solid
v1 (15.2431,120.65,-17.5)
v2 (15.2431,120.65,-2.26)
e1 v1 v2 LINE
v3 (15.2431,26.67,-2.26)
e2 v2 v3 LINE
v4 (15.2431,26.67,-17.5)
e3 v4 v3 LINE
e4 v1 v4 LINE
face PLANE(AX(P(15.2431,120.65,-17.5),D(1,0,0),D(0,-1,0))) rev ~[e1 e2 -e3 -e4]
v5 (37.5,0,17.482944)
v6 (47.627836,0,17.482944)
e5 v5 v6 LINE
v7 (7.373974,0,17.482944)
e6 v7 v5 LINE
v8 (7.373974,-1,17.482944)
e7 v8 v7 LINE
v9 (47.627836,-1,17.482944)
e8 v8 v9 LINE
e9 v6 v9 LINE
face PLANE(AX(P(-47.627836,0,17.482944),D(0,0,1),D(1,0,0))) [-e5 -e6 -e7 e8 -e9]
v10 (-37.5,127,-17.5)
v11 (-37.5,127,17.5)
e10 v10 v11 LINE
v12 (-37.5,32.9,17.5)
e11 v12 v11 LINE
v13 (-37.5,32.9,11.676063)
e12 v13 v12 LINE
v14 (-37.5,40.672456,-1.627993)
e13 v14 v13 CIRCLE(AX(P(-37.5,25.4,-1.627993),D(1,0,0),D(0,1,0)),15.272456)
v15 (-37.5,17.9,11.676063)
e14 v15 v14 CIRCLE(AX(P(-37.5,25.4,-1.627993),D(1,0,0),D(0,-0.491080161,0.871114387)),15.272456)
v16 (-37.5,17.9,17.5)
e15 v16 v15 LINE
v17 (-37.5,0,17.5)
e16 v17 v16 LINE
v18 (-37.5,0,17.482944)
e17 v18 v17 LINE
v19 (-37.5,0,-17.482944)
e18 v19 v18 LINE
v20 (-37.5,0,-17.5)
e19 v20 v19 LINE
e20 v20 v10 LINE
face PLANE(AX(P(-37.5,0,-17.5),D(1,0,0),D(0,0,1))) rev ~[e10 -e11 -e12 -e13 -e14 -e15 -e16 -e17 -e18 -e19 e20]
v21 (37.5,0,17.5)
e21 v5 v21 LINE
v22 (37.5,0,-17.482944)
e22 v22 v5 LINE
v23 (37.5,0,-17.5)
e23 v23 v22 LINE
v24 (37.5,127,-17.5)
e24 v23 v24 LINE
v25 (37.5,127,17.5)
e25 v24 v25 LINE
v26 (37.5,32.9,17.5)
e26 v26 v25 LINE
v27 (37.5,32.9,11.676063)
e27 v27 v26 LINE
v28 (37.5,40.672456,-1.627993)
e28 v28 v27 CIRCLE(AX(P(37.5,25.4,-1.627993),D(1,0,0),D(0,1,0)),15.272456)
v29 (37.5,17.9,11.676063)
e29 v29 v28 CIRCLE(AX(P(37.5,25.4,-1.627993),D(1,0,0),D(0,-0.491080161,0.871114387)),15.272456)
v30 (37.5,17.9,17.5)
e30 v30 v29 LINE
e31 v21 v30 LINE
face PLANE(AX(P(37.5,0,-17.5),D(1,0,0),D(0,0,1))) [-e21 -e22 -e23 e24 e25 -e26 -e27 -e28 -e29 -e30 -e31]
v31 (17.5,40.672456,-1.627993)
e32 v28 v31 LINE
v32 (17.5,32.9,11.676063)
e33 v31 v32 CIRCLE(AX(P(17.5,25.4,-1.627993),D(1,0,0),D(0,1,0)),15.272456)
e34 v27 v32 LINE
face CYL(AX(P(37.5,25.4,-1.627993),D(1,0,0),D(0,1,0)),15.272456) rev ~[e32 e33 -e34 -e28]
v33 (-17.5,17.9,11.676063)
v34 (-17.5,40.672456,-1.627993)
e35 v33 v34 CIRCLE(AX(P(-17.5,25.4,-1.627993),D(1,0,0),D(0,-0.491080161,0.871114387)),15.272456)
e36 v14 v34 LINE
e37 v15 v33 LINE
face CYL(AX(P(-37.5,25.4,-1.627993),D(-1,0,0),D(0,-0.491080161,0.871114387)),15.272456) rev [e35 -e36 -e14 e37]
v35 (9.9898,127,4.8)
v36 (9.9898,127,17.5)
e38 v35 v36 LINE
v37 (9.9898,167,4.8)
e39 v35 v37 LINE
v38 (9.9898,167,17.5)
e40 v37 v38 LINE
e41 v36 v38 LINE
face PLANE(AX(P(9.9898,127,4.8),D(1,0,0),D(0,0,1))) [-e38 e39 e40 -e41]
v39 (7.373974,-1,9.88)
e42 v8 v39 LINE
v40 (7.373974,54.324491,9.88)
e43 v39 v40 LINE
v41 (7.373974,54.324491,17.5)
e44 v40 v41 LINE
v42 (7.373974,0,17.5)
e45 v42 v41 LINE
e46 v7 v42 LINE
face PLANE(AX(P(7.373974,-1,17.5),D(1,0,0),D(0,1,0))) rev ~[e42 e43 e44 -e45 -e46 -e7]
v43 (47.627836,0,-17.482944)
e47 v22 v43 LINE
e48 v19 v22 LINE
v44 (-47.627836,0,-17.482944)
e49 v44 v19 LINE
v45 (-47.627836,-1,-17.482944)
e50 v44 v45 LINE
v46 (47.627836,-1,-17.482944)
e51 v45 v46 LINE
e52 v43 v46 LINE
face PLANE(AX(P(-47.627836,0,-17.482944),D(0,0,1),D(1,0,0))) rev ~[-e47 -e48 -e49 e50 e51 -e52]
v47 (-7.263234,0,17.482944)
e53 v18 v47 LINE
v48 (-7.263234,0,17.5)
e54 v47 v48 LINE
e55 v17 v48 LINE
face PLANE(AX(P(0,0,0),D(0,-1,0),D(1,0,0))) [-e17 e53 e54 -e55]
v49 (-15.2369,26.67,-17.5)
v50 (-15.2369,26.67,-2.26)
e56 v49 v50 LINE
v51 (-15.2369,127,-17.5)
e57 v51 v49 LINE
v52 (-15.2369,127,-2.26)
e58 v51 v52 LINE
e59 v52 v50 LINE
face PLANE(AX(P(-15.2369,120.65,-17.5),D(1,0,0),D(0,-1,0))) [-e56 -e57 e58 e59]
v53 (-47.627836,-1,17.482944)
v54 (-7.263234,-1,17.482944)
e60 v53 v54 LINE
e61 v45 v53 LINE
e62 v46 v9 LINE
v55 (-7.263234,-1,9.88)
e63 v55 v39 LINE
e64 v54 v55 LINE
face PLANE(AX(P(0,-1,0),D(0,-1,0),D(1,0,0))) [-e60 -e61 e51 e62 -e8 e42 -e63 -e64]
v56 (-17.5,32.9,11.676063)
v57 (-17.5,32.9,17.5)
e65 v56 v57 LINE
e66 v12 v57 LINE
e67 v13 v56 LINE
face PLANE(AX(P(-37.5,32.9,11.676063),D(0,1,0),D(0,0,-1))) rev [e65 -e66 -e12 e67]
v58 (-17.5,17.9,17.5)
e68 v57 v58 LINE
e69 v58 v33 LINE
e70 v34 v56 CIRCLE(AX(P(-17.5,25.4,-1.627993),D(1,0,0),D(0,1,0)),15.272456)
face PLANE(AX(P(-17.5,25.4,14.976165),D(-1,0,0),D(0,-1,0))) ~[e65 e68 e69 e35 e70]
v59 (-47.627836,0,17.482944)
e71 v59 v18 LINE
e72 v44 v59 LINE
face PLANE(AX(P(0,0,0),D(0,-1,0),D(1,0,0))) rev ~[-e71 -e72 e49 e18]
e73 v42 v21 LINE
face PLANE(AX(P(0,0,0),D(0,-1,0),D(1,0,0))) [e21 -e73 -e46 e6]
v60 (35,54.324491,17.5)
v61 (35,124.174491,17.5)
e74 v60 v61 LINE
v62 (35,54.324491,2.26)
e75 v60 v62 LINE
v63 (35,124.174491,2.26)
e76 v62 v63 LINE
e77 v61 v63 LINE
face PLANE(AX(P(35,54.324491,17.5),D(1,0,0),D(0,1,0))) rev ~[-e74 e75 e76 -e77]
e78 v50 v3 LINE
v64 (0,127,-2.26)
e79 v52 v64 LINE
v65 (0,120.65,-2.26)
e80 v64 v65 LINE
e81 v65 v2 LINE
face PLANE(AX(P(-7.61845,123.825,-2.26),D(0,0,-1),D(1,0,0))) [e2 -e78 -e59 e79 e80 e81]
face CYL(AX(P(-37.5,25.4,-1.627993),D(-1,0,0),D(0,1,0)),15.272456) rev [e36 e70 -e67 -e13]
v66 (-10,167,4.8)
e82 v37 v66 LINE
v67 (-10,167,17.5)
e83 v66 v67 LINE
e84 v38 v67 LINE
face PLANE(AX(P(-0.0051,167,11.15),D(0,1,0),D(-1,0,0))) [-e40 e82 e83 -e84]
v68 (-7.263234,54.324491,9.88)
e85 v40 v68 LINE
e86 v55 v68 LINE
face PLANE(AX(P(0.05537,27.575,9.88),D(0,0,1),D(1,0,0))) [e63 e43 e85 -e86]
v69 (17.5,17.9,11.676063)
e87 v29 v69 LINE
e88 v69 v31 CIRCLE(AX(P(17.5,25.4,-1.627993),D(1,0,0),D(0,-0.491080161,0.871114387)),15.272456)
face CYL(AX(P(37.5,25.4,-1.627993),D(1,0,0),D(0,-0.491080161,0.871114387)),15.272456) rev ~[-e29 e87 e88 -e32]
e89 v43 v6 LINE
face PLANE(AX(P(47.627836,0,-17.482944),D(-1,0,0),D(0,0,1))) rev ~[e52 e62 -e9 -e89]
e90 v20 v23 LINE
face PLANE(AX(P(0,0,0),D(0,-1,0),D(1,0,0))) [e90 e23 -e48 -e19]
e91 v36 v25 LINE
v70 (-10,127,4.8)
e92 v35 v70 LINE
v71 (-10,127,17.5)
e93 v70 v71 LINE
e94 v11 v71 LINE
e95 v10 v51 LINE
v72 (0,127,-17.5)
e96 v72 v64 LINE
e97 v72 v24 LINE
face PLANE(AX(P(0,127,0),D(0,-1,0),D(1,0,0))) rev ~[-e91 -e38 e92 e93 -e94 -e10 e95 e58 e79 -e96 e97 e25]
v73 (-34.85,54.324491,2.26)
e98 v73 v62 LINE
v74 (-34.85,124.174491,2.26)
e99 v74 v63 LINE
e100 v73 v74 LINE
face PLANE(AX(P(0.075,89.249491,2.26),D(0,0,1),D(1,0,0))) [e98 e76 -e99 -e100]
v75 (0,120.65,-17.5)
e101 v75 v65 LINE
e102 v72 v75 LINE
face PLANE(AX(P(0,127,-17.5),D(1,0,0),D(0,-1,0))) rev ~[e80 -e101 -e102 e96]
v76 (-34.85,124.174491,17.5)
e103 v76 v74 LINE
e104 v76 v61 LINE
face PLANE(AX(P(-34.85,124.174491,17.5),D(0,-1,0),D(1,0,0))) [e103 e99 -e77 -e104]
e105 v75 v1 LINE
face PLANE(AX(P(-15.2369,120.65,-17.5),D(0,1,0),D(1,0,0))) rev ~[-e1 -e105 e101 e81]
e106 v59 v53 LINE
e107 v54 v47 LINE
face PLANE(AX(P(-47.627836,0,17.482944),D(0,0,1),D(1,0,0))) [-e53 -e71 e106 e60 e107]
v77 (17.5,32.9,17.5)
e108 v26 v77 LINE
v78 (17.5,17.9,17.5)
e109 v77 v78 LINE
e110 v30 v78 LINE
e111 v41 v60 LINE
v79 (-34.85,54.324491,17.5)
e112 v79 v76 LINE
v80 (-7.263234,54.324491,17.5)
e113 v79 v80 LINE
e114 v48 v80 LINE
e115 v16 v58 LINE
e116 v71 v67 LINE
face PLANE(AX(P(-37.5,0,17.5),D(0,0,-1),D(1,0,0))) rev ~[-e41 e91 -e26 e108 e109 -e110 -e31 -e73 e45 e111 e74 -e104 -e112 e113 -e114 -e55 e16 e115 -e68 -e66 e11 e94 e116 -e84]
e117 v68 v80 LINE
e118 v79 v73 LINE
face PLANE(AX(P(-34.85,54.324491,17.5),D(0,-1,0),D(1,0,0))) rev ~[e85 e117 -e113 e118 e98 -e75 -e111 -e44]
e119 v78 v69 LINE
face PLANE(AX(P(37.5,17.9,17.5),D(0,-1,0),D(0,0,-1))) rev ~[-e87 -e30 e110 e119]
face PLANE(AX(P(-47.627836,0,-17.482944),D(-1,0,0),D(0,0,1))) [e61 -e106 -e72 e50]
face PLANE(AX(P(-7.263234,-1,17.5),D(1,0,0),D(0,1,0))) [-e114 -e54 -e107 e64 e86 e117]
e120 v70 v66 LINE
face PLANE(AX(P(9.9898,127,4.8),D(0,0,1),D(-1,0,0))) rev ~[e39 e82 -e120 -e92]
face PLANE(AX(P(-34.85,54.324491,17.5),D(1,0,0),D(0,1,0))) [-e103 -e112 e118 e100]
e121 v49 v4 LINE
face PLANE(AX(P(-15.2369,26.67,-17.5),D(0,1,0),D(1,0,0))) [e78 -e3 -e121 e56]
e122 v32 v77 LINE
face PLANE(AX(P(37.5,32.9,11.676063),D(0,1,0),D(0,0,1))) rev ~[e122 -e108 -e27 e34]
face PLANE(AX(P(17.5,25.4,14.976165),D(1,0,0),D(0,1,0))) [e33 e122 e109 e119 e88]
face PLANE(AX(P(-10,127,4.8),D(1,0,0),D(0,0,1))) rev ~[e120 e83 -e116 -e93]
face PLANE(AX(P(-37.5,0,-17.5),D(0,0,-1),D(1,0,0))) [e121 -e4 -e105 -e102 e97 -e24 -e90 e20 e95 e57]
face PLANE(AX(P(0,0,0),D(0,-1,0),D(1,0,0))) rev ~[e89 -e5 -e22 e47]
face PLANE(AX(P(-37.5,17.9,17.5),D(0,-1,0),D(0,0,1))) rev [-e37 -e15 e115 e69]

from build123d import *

# Parameters (mm, degrees)
F0_W      = 75
F0_H      = 35
F1_DEPTH  = 127
F3_DEPTH  = 20
F5_W      = 19.9898
F5_H      = 12.7
F6_DEPTH  = 40
F7_W      = 69.85
F7_H      = 69.85
F8_DEPTH  = 15.24
F9_W      = 95.2556729317
F9_H      = 34.9658876657
F10_DEPTH = 1
F11_W     = 14.6372080781
F11_H     = 57.15
F12_DEPTH = 7.62
F13_W     = 30.48
F13_H     = 93.98
F14_DEPTH = 15.24
F15_W     = 15.2369
F15_H     = 6.35
F16_DEPTH = 15.24


# Not quite as in the source:
# - a feature names something its author has since deleted; it is built from what else it names


with BuildPart() as f1:
    # F0 (on Front) → F1 (new body)
    with BuildSketch(Plane.XZ):
        Rectangle(F0_W, F0_H)
    extrude(amount=-F1_DEPTH)

    # F2 (on face) → F3 (cut)
    with BuildSketch(Plane.YZ.offset(37.5)):
        with BuildLine():
            ThreePointArc((17.9, 11.676062799), (25.4, 13.6444626123), (32.9, 11.676062799))
            Line((32.9, 11.676062799), (32.9, 17.5))
            Line((32.9, 17.5), (17.9, 17.5))
            Line((17.9, 17.5), (17.9, 11.676062799))
        make_face()
        with BuildLine():
            Line((32.9, 9.7889252245), (32.9, 11.676062799))
            ThreePointArc((32.9, 11.676062799), (25.4, 13.6444626123), (17.9, 11.676062799))
            Line((17.9, 11.676062799), (17.9, 9.7889252245))
            Line((17.9, 9.7889252245), (32.9, 9.7889252245))
        make_face()
        with BuildLine():
            ThreePointArc((17.9, 11.676062799), (17.6959593413, -14.8149434406), (40.672455682, -1.6279930697))
            ThreePointArc((40.672455682, -1.6279930697), (38.586950371, 6.076047589), (32.9, 11.676062799))
            Line((32.9, 11.676062799), (32.9, 9.7889252245))
            Line((32.9, 9.7889252245), (17.9, 9.7889252245))
            Line((17.9, 9.7889252245), (17.9, 11.676062799))
        make_face()
    extrude(amount=-F3_DEPTH, mode=Mode.SUBTRACT)

    # F4: F1 across plane


with BuildPart() as f1_1:
    add(f1.part)
    add(f1.part.mirror(Plane.YZ), mode=Mode.INTERSECT)

    # F5 (on face) → F6 (join)
    with BuildSketch(Plane(origin=(0, 127, 0), x_dir=(-1, 0, 0), z_dir=(0, 1, 0))):
        with Locations((0.0051, 11.15)):
            Rectangle(F5_W, F5_H)
    extrude(amount=F6_DEPTH)

    # F7 (on face) → F8 (cut)
    with BuildSketch(Plane.XY.offset(17.5)):
        with Locations((0.075, 89.2494911432)):
            Rectangle(F7_W, F7_H)
    extrude(amount=-F8_DEPTH, mode=Mode.SUBTRACT)

    # F9 (on Front) → F10 (join)
    with BuildSketch(Plane.XZ):
        Rectangle(F9_W, F9_H)
    extrude(amount=F10_DEPTH)

    # F11 (on face) → F12 (cut)
    with BuildSketch(Plane.XY.offset(17.5)):
        with Locations((0.0553701539, 27.575)):
            Rectangle(F11_W, F11_H)
    extrude(amount=-F12_DEPTH, mode=Mode.SUBTRACT)

    # F13 (on face) → F14 (cut)
    with BuildSketch(Plane(origin=(0, 0, -17.5), x_dir=(1, 0, 0), z_dir=(0, 0, -1))):
        with Locations((0.0031, -73.66)):
            Rectangle(F13_W, F13_H)
    extrude(amount=-F14_DEPTH, mode=Mode.SUBTRACT)

    # F15 (on face) → F16 (cut)
    with BuildSketch(Plane(origin=(0, 0, -17.5), x_dir=(1, 0, 0), z_dir=(0, 0, -1))):
        with Locations((-7.61845, -123.825)):
            Rectangle(F15_W, F15_H)
    extrude(amount=-F16_DEPTH, mode=Mode.SUBTRACT)


solid = f1_1.part
